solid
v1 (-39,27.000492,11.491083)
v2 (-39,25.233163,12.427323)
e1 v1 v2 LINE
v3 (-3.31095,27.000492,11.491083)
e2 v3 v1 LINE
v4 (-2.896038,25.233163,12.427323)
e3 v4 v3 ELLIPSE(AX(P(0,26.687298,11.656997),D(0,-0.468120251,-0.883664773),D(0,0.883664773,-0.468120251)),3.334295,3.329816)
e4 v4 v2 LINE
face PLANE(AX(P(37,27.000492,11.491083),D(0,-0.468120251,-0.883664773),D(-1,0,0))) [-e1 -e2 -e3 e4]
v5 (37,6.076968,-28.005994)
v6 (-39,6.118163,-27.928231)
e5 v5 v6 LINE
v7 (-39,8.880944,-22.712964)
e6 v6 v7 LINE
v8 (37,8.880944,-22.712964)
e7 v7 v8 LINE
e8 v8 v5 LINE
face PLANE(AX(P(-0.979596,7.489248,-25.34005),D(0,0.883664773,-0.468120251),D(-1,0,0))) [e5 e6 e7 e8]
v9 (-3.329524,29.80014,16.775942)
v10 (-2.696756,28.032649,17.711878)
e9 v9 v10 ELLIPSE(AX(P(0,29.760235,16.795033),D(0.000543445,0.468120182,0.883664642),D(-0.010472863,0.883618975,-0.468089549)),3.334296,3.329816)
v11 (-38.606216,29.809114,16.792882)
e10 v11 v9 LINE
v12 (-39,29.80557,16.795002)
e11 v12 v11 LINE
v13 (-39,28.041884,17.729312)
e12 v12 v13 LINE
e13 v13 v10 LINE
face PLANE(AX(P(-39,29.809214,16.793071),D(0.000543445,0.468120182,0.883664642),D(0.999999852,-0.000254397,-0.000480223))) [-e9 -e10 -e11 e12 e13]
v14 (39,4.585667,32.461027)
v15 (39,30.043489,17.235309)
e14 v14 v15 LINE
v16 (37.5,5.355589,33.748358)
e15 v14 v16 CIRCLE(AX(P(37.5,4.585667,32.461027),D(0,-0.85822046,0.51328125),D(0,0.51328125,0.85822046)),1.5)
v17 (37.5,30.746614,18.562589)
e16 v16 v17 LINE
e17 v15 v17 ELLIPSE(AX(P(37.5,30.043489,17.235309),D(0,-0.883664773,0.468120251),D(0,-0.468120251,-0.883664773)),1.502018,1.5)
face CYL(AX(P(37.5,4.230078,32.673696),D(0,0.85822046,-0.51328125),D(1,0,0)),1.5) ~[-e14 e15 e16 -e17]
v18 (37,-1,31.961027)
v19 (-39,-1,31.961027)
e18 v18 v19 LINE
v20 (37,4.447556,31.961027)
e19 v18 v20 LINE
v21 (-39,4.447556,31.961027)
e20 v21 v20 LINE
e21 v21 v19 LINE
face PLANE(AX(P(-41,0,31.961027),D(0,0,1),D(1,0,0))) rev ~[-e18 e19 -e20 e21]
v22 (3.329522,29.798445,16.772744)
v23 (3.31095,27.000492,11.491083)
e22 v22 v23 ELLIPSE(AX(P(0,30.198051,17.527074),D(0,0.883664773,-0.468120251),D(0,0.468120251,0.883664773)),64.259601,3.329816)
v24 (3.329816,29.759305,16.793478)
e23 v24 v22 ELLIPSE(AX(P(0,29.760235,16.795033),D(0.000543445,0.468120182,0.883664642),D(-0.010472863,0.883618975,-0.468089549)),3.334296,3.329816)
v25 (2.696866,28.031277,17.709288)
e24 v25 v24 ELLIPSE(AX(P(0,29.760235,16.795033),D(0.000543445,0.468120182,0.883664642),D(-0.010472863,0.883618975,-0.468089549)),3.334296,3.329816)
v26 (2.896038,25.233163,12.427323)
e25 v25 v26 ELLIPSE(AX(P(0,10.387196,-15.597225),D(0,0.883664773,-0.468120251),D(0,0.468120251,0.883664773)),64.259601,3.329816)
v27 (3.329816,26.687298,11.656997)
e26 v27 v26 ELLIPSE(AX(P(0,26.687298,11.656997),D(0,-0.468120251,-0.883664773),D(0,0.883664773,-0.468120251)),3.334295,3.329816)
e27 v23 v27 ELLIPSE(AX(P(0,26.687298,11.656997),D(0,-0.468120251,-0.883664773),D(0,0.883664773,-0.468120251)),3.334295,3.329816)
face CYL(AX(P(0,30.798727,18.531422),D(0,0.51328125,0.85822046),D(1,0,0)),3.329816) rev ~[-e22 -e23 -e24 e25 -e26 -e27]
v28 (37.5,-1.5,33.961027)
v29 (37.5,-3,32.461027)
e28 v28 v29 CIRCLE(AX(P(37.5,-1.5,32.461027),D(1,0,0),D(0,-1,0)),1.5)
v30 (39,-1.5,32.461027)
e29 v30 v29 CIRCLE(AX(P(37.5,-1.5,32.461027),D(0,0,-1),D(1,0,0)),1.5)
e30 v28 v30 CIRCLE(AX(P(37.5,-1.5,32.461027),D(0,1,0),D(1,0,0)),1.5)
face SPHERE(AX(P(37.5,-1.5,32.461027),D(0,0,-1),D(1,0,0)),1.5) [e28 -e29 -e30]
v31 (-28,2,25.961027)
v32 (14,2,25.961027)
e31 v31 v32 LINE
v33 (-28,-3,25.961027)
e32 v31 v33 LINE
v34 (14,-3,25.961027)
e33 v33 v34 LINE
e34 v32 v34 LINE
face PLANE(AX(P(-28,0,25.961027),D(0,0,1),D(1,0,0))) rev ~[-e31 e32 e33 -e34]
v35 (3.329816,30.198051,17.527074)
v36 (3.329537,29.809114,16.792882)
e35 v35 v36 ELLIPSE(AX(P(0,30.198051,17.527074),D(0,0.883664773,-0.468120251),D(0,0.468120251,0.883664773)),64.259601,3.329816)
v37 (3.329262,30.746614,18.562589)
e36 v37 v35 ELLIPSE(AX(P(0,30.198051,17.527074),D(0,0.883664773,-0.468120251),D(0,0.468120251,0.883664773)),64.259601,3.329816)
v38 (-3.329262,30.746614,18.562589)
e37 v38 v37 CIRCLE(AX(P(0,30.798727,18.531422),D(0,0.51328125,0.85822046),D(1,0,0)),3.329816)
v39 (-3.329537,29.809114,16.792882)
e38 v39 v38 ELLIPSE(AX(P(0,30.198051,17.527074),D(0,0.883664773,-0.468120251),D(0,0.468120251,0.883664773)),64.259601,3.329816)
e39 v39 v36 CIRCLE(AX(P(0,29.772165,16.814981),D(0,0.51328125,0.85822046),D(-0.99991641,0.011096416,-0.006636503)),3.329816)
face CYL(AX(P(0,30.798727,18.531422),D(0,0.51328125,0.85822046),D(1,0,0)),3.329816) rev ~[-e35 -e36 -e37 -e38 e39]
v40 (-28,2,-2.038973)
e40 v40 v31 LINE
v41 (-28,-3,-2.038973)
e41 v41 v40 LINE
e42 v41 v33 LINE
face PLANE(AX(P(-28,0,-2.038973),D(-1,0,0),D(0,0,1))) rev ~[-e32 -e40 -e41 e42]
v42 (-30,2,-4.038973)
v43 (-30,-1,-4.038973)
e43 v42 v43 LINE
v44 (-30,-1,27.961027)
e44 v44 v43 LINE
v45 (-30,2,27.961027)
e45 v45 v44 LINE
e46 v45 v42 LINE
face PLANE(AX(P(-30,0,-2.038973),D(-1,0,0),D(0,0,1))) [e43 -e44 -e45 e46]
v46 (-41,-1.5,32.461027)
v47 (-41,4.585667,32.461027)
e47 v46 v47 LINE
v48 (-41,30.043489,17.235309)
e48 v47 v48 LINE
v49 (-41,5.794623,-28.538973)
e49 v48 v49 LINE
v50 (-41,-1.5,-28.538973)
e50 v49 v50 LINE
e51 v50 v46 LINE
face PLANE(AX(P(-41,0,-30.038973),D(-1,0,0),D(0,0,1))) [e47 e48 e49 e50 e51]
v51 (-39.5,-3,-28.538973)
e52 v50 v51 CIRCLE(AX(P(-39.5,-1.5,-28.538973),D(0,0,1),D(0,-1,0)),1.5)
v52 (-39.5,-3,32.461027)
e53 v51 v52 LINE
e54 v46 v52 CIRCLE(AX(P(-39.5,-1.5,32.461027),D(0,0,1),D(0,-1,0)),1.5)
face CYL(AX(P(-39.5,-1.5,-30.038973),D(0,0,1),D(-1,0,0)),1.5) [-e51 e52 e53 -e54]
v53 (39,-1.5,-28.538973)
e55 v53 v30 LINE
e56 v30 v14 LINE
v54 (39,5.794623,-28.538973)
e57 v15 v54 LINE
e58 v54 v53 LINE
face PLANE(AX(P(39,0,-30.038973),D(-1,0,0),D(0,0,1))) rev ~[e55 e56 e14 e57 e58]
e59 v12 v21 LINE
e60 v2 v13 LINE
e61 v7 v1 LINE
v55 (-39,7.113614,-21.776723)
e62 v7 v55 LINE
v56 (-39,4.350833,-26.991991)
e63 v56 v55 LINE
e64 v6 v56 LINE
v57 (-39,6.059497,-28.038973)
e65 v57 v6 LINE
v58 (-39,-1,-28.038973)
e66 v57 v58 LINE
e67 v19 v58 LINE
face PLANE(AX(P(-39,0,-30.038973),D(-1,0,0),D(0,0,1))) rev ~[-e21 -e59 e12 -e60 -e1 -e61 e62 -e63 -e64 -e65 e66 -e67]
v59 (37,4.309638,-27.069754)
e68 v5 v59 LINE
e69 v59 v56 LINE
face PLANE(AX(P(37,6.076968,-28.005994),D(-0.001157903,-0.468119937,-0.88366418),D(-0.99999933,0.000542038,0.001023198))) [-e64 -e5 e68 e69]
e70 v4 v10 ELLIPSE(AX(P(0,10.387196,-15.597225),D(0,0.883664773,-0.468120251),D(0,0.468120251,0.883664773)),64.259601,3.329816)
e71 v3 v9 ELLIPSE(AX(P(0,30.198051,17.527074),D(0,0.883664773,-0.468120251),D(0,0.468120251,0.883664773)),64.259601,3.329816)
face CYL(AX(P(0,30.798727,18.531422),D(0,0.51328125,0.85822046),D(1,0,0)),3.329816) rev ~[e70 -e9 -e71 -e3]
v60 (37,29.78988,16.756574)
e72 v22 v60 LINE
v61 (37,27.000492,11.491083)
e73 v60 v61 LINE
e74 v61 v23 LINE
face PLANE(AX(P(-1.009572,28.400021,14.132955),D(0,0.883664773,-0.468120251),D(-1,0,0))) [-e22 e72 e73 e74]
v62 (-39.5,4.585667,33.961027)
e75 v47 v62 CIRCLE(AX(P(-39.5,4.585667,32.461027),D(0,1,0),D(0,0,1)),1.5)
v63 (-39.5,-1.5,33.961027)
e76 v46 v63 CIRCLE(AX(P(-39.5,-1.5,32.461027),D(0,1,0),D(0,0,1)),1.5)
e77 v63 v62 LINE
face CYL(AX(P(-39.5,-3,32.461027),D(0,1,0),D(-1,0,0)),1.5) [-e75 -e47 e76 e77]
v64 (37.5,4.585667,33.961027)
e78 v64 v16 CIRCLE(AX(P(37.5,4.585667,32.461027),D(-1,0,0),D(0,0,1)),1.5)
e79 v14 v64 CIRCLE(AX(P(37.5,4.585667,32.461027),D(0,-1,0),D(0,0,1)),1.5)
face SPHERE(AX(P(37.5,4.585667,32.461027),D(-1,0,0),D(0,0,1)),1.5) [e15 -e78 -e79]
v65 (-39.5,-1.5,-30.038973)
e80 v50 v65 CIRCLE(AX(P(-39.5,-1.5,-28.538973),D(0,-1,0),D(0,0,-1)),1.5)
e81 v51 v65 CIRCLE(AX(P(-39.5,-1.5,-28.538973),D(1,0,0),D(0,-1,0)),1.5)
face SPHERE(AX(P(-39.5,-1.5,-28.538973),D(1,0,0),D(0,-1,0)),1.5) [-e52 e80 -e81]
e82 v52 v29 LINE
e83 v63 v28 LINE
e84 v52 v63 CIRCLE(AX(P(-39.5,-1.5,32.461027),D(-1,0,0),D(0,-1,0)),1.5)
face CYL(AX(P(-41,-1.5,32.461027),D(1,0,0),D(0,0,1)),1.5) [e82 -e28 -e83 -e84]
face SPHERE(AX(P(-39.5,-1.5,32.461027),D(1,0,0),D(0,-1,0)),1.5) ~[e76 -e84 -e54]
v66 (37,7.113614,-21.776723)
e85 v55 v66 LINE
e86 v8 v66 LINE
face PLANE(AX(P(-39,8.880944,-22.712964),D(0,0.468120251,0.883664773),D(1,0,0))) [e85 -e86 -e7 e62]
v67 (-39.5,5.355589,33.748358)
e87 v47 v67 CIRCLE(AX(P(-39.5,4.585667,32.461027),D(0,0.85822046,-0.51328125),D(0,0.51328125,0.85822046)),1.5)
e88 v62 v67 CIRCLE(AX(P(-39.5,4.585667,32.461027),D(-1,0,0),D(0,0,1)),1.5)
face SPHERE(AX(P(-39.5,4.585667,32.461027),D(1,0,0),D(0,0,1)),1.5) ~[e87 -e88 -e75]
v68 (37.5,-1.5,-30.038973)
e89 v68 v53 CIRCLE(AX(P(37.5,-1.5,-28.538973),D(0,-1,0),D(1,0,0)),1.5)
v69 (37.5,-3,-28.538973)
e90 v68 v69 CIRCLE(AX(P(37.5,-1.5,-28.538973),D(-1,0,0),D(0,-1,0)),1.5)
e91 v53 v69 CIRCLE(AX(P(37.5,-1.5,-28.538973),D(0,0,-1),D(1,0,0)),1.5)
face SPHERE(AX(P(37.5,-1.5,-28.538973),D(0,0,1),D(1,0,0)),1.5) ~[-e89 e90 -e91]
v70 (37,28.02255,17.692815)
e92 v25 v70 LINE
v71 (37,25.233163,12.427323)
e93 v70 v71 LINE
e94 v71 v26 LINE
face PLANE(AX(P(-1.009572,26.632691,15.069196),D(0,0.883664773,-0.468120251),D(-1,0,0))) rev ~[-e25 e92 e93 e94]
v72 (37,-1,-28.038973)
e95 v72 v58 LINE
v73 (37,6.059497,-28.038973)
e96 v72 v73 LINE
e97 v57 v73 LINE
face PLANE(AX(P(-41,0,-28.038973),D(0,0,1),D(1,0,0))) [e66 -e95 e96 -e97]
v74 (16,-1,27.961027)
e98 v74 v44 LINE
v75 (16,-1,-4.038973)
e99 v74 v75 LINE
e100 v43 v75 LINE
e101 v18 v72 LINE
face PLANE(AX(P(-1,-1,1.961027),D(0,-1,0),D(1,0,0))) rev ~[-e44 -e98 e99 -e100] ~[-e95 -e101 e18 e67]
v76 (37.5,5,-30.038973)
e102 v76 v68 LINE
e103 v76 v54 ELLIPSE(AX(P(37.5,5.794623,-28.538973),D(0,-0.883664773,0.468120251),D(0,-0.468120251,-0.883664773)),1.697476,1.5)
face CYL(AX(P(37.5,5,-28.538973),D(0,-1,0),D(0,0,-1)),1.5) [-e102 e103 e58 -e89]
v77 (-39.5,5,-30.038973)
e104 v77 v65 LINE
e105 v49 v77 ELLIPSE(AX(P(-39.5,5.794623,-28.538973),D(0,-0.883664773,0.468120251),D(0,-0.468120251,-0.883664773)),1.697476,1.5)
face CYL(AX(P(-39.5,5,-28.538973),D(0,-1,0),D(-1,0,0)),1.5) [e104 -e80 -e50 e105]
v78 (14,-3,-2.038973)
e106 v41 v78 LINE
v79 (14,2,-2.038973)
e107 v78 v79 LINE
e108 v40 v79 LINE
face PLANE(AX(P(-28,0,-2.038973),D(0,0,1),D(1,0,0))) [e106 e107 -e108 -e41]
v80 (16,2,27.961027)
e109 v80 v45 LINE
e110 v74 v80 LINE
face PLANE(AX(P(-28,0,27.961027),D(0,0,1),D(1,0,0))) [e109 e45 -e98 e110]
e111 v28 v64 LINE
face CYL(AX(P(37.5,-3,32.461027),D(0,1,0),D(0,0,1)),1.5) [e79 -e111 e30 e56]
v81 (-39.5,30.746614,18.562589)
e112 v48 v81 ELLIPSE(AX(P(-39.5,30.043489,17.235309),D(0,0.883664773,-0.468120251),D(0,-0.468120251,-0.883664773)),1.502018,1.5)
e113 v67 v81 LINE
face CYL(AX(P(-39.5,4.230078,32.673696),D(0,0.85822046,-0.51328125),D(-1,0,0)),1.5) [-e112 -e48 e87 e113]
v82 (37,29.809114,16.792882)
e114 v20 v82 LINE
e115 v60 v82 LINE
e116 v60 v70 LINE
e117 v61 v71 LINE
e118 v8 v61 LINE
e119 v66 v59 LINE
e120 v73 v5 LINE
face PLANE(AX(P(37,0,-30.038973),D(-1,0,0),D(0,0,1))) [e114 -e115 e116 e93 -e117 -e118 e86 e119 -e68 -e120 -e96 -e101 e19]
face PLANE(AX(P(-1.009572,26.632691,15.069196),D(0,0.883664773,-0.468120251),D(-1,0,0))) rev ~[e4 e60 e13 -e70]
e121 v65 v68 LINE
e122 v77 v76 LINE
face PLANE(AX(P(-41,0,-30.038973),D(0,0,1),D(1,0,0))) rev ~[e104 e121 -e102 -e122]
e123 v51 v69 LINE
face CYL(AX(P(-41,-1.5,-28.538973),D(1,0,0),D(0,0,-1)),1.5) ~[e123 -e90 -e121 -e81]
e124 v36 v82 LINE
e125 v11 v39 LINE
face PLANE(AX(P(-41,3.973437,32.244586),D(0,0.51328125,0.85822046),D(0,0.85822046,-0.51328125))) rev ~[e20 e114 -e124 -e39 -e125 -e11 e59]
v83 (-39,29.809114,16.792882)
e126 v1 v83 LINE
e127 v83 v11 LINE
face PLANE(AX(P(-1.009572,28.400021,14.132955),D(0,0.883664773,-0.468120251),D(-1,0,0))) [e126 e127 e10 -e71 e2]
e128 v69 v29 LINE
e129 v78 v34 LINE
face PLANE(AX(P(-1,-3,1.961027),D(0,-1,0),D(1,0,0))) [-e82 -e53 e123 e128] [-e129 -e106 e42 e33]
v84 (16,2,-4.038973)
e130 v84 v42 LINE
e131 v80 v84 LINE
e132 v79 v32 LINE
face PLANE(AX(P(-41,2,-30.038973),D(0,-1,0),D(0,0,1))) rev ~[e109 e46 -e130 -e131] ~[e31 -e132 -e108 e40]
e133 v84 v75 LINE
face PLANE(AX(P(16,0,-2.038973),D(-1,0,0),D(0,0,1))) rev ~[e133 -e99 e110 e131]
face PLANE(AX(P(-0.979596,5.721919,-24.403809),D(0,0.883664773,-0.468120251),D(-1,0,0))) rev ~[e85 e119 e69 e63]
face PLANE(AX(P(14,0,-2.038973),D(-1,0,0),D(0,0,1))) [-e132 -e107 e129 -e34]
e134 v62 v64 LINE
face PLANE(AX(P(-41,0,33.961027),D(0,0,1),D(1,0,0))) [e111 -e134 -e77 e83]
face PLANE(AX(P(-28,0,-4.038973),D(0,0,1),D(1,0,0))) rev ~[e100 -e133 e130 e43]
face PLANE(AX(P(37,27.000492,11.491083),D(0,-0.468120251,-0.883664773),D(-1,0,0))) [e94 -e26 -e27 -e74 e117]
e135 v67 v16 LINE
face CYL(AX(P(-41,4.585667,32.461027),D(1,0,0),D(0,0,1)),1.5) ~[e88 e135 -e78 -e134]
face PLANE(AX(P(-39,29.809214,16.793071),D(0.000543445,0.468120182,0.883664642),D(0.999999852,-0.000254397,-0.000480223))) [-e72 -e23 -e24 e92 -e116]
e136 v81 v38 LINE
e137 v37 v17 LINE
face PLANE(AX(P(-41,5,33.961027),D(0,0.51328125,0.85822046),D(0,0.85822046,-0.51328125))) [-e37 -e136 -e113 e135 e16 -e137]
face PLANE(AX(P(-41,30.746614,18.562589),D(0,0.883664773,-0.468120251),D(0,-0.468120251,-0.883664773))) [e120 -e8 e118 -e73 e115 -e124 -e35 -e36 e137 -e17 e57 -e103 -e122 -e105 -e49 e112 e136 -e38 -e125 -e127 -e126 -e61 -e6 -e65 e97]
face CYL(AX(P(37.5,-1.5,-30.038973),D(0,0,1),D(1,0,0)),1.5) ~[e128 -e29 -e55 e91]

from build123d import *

# Parameters (mm, degrees)
F0_W      = 80
F0_H      = 64
F0_W_2    = 42
F0_H_2    = 28
F1_DEPTH  = 3
F4_DEPTH  = 80
F5_T      = -2
F6_DEPTH  = 5
F7_R      = 1.5
F12_DEPTH = 2
F13_DEPTH = 2
F15_R     = 3.3298156999
F16_DEPTH = 25


# Not quite as in the source:
# - a feature names something its author has since deleted; it is built from what else it names


with BuildPart() as f1:
    # F0 (on Front) → F1 (new body)
    with BuildSketch(Plane.XZ):
        with Locations((-1, 1.9610269163)):
            Rectangle(F0_W, F0_H)
        with Locations((-7, 11.9610269163)):
            Rectangle(F0_W_2, F0_H_2, mode=Mode.SUBTRACT)
    extrude(amount=F1_DEPTH)

    # F3 (on offset) → F4 (join)
    with BuildSketch(Plane(origin=(-41, 0, 0), x_dir=(0, -1, 0), z_dir=(-1, 0, 0))):
        Polygon((0, -30.0389730837), (0, 33.9610269163), (-5, 33.9610269163), (-30.7466138076, 18.5625894163), (-5, -30.0389730837), align=None)
    extrude(amount=-F4_DEPTH)

    # F5
    f5_openings = [f1.faces().sort_by_distance(p)[0] for p in [
        (-1, 17.873307, -5.738192),
    ]]
    offset(amount=F5_T, openings=f5_openings, kind=Kind.INTERSECTION)

    # F0 (on Front) → F6 (cut)
    with BuildSketch(Plane.XZ):
        with Locations((-7, 11.9610269163)):
            Rectangle(F0_W_2, F0_H_2)
    extrude(amount=-F6_DEPTH, mode=Mode.SUBTRACT)

    # F7
    f7_edges = [f1.edges().sort_by_distance(p)[0] for p in [
        (39, -3, 1.961027),
        (39, 1, -30.038973),
        (-1, -3, -30.038973),
        (39, 1, 33.961027),
        (39, 17.873307, 26.261808),
        (-1, -3, 33.961027),
        (-1, 5, 33.961027),
        (-41, -3, 1.961027),
        (-41, 1, 33.961027),
        (-41, 17.873307, 26.261808),
        (-41, 1, -30.038973),
    ]]
    fillet(f7_edges, radius=F7_R)


with BuildPart() as f8_1:
    # F8: copy of F1
    add(f1.part)


with BuildPart() as f1_1:
    add(f1.part)

    # F11 (on offset) → F12 (join)
    with BuildSketch(Plane(origin=(0, 16.3302800697, -8.6509443873), x_dir=(-1, 0, 0), z_dir=(0, 0.8836647727, -0.468120251))):
        Polygon((-37, -15.9132964909), (-37, -21.9031590968), (39, -21.8151584268), (39, -15.9132964909), align=None)
    extrude(amount=-F12_DEPTH)

    # F11 (on offset) → F13 (join)
    with BuildSketch(Plane(origin=(0, 16.3302800697, -8.6509443873), x_dir=(-1, 0, 0), z_dir=(0, 0.8836647727, -0.468120251))):
        Polygon((39, 22.7937423885), (39, 28.7937423885), (-37, 28.7524405867), (-37, 22.7937423885), align=None)
    extrude(amount=-F13_DEPTH)

    # F15 (on offset) → F16 (cut)
    with BuildSketch(Plane(origin=(0, 16.2774082354, 27.2162772116), x_dir=(1, 0, 0), z_dir=(0, 0.51328125, 0.8582204603))):
        with Locations((0, 16.920266673)):
            Circle(F15_R)
    extrude(amount=-F16_DEPTH, mode=Mode.SUBTRACT)


solid = f1_1.part
